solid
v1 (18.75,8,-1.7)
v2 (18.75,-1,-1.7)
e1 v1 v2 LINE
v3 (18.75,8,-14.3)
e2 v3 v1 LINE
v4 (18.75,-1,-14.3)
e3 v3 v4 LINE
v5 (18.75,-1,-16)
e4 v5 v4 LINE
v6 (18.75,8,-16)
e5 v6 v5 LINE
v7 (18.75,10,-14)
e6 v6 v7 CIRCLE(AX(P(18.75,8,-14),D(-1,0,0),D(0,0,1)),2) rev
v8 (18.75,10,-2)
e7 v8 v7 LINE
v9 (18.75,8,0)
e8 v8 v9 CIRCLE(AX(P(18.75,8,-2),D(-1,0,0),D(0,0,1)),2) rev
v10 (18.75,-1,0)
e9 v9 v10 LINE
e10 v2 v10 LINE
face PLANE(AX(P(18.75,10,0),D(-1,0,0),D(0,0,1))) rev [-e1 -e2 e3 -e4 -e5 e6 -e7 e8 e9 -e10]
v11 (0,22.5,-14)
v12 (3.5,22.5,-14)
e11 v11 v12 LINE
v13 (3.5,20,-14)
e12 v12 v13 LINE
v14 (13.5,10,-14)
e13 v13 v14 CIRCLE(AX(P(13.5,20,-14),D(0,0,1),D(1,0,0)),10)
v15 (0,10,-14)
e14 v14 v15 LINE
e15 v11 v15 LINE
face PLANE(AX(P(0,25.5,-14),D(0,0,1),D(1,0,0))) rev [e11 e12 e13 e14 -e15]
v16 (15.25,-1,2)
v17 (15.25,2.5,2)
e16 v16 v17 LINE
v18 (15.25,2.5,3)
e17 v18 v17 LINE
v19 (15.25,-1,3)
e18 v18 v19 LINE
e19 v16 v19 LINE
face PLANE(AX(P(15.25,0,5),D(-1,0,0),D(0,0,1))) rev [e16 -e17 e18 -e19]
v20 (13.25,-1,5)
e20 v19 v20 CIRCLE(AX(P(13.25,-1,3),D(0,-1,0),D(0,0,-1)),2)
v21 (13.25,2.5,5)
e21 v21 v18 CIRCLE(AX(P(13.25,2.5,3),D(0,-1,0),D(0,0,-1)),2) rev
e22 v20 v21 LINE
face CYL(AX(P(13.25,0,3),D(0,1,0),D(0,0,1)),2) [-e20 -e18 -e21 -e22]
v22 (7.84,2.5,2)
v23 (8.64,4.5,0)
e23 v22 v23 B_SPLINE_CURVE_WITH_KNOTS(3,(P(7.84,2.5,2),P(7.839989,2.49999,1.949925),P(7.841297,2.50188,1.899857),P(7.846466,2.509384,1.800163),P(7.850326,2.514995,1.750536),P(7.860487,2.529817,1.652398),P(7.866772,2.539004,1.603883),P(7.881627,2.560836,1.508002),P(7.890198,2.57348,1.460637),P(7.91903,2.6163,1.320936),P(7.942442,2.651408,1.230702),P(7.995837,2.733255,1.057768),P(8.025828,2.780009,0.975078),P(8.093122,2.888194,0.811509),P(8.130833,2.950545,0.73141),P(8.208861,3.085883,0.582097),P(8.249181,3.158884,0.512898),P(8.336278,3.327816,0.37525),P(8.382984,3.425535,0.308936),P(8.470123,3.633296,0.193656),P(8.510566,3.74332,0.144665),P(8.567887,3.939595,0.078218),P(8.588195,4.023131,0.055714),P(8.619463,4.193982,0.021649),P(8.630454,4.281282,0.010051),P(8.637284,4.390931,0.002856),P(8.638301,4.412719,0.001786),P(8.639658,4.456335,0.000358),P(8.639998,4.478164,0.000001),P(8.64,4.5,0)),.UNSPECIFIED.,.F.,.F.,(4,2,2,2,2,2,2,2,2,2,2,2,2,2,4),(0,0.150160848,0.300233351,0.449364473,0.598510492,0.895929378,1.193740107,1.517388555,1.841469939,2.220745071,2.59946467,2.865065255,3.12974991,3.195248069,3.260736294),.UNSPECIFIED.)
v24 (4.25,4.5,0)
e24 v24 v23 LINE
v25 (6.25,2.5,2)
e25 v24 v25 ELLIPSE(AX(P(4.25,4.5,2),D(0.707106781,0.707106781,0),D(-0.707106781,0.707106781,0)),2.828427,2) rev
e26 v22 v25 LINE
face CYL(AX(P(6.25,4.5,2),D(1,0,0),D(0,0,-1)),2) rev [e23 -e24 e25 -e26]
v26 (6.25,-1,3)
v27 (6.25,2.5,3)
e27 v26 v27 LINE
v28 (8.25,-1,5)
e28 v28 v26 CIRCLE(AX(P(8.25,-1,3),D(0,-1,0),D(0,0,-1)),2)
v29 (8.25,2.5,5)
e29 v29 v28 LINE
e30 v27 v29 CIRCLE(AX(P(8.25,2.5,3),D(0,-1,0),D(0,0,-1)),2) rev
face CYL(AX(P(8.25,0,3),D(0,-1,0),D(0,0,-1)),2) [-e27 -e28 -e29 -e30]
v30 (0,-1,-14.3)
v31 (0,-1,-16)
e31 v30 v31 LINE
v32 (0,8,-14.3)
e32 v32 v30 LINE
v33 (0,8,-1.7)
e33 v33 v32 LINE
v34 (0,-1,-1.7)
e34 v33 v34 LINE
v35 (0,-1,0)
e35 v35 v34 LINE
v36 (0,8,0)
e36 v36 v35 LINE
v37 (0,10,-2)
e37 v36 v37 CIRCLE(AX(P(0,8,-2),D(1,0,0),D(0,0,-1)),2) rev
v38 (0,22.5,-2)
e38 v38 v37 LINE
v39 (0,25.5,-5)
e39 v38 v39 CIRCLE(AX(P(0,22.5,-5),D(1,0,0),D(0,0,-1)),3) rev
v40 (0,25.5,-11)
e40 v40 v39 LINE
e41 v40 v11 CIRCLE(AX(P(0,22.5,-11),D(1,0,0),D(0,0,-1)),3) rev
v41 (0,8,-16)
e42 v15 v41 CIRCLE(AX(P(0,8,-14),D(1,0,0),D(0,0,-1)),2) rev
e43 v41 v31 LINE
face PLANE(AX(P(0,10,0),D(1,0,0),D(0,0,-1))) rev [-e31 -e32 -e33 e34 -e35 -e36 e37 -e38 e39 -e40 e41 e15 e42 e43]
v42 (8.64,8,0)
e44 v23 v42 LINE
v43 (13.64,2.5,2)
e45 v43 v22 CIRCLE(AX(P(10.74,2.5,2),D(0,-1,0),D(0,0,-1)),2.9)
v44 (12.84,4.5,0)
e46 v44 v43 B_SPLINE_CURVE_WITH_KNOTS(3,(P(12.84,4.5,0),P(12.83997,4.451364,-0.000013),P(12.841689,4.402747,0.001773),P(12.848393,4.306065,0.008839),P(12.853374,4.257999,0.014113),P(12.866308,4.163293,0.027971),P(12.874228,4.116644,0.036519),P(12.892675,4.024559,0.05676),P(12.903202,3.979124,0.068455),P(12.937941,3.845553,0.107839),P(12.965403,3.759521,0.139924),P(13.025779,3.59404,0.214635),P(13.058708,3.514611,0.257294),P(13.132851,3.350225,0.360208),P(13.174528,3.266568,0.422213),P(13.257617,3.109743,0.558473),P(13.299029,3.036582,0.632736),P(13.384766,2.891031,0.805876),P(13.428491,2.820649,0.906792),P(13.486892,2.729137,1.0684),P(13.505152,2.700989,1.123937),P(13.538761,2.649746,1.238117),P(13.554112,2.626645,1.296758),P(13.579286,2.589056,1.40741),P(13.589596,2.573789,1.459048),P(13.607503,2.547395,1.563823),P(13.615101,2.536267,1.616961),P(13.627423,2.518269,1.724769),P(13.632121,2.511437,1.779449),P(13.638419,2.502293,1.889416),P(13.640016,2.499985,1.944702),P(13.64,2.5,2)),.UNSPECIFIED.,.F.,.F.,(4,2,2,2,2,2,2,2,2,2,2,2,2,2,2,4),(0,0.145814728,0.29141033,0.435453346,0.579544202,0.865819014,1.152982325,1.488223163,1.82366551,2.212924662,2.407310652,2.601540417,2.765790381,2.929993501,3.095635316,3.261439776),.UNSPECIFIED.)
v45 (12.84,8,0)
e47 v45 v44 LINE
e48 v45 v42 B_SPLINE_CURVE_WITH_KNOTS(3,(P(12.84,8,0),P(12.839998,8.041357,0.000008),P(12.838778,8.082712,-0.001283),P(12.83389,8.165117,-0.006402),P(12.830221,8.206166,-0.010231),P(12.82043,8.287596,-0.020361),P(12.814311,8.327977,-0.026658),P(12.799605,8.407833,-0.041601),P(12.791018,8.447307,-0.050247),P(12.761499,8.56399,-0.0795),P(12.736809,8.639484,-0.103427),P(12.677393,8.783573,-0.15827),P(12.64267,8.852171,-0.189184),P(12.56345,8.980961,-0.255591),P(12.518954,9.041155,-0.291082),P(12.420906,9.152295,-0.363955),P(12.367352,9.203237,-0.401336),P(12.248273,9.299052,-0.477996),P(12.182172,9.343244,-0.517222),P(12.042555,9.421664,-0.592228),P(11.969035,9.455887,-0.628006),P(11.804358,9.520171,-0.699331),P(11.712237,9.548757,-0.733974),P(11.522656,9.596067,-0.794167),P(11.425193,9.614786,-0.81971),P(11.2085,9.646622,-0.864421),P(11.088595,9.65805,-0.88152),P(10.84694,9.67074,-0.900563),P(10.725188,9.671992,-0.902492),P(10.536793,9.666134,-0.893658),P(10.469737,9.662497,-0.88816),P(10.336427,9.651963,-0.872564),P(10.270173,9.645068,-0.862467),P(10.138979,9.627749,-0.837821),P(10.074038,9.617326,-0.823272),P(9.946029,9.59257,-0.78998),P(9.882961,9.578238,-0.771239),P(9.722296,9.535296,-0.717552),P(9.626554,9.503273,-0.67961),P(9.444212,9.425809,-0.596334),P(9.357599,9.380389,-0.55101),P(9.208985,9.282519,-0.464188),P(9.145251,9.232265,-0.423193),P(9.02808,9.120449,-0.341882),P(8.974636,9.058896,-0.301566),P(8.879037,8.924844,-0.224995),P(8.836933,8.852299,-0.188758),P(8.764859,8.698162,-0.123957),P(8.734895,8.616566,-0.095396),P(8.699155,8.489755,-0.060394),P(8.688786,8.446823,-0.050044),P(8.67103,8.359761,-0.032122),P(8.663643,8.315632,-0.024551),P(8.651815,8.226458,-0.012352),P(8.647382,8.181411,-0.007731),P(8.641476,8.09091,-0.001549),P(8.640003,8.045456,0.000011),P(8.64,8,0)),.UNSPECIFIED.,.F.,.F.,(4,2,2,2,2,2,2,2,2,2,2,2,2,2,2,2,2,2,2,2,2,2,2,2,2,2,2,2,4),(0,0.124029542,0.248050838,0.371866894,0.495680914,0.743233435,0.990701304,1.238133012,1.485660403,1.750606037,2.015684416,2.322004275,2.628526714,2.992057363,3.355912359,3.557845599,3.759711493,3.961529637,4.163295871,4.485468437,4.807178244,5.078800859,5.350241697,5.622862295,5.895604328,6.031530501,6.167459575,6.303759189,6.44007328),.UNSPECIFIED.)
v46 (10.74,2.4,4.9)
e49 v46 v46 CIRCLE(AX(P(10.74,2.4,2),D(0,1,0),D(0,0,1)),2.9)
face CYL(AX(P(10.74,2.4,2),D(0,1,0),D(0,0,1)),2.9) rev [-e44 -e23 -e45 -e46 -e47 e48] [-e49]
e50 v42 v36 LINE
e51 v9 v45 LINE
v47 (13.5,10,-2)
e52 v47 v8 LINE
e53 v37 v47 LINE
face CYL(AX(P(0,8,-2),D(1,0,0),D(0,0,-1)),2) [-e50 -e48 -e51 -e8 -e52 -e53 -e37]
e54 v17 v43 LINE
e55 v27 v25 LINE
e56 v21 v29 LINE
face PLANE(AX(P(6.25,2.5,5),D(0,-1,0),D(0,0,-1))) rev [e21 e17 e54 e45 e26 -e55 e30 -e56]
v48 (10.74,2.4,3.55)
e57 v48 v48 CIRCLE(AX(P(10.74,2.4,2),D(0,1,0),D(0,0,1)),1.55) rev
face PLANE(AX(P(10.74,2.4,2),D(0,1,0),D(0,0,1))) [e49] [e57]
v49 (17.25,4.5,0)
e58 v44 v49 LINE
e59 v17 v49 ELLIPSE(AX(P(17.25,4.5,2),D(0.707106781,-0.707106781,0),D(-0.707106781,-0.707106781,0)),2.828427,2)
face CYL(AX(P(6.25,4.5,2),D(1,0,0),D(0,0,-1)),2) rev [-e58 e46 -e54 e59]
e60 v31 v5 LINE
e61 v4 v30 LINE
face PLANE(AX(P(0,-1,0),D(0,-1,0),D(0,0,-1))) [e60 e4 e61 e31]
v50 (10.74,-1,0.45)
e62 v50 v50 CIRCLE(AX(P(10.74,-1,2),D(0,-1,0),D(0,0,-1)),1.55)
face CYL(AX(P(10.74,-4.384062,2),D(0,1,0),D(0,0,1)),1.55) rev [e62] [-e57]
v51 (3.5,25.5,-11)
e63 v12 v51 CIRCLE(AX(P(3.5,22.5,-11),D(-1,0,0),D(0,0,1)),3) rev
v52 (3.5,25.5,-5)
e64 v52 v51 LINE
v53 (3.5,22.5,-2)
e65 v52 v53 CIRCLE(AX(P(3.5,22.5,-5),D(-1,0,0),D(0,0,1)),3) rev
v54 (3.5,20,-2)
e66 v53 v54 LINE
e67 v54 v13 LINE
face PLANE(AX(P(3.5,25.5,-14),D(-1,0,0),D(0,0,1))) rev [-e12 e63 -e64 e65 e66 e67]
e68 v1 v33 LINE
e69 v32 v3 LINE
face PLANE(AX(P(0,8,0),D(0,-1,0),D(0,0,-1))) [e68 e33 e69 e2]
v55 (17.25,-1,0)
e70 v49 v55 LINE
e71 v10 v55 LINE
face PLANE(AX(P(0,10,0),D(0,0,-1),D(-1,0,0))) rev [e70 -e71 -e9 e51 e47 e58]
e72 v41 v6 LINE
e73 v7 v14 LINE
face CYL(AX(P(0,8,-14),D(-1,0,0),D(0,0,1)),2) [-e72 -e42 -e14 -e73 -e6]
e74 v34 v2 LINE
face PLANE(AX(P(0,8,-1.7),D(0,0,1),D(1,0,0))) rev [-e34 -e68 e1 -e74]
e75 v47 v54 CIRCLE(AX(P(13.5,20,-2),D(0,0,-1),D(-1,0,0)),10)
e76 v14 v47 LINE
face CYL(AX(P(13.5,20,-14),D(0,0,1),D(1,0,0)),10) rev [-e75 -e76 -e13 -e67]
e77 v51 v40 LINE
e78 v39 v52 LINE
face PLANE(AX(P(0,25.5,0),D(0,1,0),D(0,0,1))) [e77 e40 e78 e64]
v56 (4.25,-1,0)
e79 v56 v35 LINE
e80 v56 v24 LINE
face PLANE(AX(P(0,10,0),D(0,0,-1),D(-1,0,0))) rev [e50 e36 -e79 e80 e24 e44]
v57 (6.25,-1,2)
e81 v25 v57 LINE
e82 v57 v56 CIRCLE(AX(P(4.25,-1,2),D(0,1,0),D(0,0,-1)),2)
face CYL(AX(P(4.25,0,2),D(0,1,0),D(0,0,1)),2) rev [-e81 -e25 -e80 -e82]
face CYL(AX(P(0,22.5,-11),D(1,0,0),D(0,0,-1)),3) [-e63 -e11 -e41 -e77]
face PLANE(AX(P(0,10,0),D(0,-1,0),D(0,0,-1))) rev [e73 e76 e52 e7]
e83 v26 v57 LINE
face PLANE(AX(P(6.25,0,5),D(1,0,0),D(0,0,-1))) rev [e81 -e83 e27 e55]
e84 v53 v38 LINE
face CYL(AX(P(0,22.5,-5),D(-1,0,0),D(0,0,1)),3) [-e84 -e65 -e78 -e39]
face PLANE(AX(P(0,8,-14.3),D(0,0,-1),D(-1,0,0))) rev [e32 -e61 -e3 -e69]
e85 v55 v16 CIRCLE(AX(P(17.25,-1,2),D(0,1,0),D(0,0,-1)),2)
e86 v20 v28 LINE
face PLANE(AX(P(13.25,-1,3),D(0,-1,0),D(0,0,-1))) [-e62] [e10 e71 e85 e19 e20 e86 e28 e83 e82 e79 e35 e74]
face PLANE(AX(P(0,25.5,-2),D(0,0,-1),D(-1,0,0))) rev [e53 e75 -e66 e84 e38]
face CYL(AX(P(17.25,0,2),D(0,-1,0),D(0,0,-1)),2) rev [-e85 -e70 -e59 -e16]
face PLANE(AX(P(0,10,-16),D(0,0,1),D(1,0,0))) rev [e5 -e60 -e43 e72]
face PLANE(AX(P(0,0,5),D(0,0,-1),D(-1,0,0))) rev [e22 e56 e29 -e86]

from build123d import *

# Parameters (mm, degrees)
SALIENTE_EXTRUIR1_DEPTH = 10
CORTAR_EXTRUIR1_DEPTH   = 8
CROQUIS3_W              = 9
CROQUIS3_H              = 2.5
SALIENTE_EXTRUIR2_DEPTH = 5
CROQUIS4_R              = 1.5499999999999994
CORTAR_EXTRUIR2_DEPTH   = 2.5
REDONDEO1_R             = 2
CROQUIS5_R              = 2.9
CORTAR_EXTRUIR3_DEPTH   = 7.6
SALIENTE_EXTRUIR3_DEPTH = 15.5
REDONDEO2_R             = 10
REDONDEO3_R             = 3
CROQUIS8_R              = 1.5499999999999994
SALIENTE_EXTRUIR5_DEPTH = 1
CROQUIS9_W              = 5
CROQUIS9_H              = 1.700000000000001
CORTAR_EXTRUIR4_DEPTH   = 36.46565245064583


with BuildPart() as part:
    # Croquis1 → Saliente-Extruir1 (new body)
    with BuildSketch(Plane(origin=(0, 0, 0), x_dir=(1, 0, 0), z_dir=(0, 1, 0))):
        Polygon((0, 0), (18.75, 0), (18.749999999999996, 16), (-3.47e-15, 16), align=None)
    extrude(amount=SALIENTE_EXTRUIR1_DEPTH)

    # Croquis2 → Cortar-Extruir1 (cut)
    with BuildSketch(Plane.XZ):
        Polygon((0, -1.7000000000000002), (18.749999999999993, -1.6999999999999997), (18.749999999999996, -14.3), (1.51e-15, -14.3), align=None)
    extrude(amount=-CORTAR_EXTRUIR1_DEPTH, mode=Mode.SUBTRACT)

    # Croquis3 → Saliente-Extruir2 (add)
    with BuildSketch(Plane.XY):
        with Locations((10.750000000000002, 1.25)):
            Rectangle(CROQUIS3_W, CROQUIS3_H)
    extrude(amount=SALIENTE_EXTRUIR2_DEPTH)

    # Croquis4 → Cortar-Extruir2 (cut)
    with BuildSketch(Plane(origin=(0, 2.5, 0), x_dir=(1, 0, 0), z_dir=(0, 1, 0))):
        with Locations(Location((10.74, -2, 0), (0, 0, 270))):
            Circle(CROQUIS4_R)
    extrude(amount=-CORTAR_EXTRUIR2_DEPTH, mode=Mode.SUBTRACT)

    # Redondeo1
    # the kernel refuses this fillet: 2 mm, written as the material it adds along each edge
    with BuildSketch(Plane(origin=(6.25, 2.5, 0), x_dir=(-1, 0, 0), z_dir=(0, -1, 0))) as redondeo1_piece_1:
        with BuildLine():
            CenterArc((REDONDEO1_R, -REDONDEO1_R), REDONDEO1_R, 90, 90)
            Line((0, -REDONDEO1_R), (0, 0))
            Line((0, 0), (REDONDEO1_R, 0))
        make_face()
    extrude(amount=2.5)
    with BuildSketch(Plane(origin=(15.25, 0, 0), x_dir=(1, 0, 0), z_dir=(0, 1, 0))) as redondeo1_piece_2:
        with BuildLine():
            CenterArc((REDONDEO1_R, -REDONDEO1_R), REDONDEO1_R, 90, 90)
            Line((0, -REDONDEO1_R), (0, 0))
            Line((0, 0), (REDONDEO1_R, 0))
        make_face()
    extrude(amount=2.5)
    with BuildSketch(Plane(origin=(15.25, 2.5, 0), x_dir=(0, 1, 0), z_dir=(-1, 0, 0))) as redondeo1_piece_3_section:
        with BuildLine():
            CenterArc((REDONDEO1_R, -REDONDEO1_R), REDONDEO1_R, 90, 90)
            Line((0, -REDONDEO1_R), (0, 0))
            Line((0, 0), (REDONDEO1_R, 0))
        make_face()
    redondeo1_piece_3 = extrude(amount=9, mode=Mode.PRIVATE)
    redondeo1_piece_3 = redondeo1_piece_3 - Plane(origin=(10.74, 2.981912580650479, 2), x_dir=(-1.8e-16, 0, 1), z_dir=(0, 1, 0)) * Cylinder(1.5499999999999994, 26, mode=Mode.PRIVATE)
    add(redondeo1_piece_3)
    with BuildSketch(Plane(origin=(6.25, 7.5, 0), x_dir=(-1, 0, 0), z_dir=(0, -1, 0))) as redondeo1_piece_4a_section:
        with BuildLine():
            CenterArc((REDONDEO1_R, -REDONDEO1_R), REDONDEO1_R, 90, 90)
            Line((0, -REDONDEO1_R), (0, 0))
            Line((0, 0), (REDONDEO1_R, 0))
        make_face()
    redondeo1_piece_4a = extrude(amount=7.5, mode=Mode.PRIVATE)
    redondeo1_piece_4a = split(redondeo1_piece_4a, bisect_by=Plane(origin=(5.797209771466349, 2.5, 0.45279022853365075), z_dir=(0, 1, 0)), keep=Keep.TOP, mode=Mode.PRIVATE)
    with BuildSketch(Plane(origin=(15.25, 2.5, 0), x_dir=(0, 1, 0), z_dir=(-1, 0, 0))) as redondeo1_piece_4b_section:
        with BuildLine():
            CenterArc((REDONDEO1_R, -REDONDEO1_R), REDONDEO1_R, 90, 90)
            Line((0, -REDONDEO1_R), (0, 0))
            Line((0, 0), (REDONDEO1_R, 0))
        make_face()
    redondeo1_piece_4b = extrude(amount=14, mode=Mode.PRIVATE)
    redondeo1_piece_4b = split(redondeo1_piece_4b, bisect_by=Plane(origin=(6.25, 2.952790228533651, 0.45279022853365075), z_dir=(-1, 0, 0)), keep=Keep.TOP, mode=Mode.PRIVATE)
    redondeo1_piece_4 = redondeo1_piece_4a & redondeo1_piece_4b
    add(redondeo1_piece_4)
    with BuildSketch(Plane(origin=(20.25, 2.5, 0), x_dir=(0, 1, 0), z_dir=(-1, 0, 0))) as redondeo1_piece_5a_section:
        with BuildLine():
            CenterArc((REDONDEO1_R, -REDONDEO1_R), REDONDEO1_R, 90, 90)
            Line((0, -REDONDEO1_R), (0, 0))
            Line((0, 0), (REDONDEO1_R, 0))
        make_face()
    redondeo1_piece_5a = extrude(amount=14, mode=Mode.PRIVATE)
    redondeo1_piece_5a = split(redondeo1_piece_5a, bisect_by=Plane(origin=(18.75, 2.952790228533651, 0.45279022853365036), z_dir=(-1, 0, 2.2e-16)), keep=Keep.TOP, mode=Mode.PRIVATE)
    redondeo1_piece_5a = split(redondeo1_piece_5a, bisect_by=Plane(origin=(15.25, 2.952790228533651, 0.45279022853365075), z_dir=(1, 0, 0)), keep=Keep.TOP, mode=Mode.PRIVATE)
    with BuildSketch(Plane(origin=(15.25, 0, 0), x_dir=(1, 0, 0), z_dir=(0, 1, 0))) as redondeo1_piece_5b_section:
        with BuildLine():
            CenterArc((REDONDEO1_R, -REDONDEO1_R), REDONDEO1_R, 90, 90)
            Line((0, -REDONDEO1_R), (0, 0))
            Line((0, 0), (REDONDEO1_R, 0))
        make_face()
    redondeo1_piece_5b = extrude(amount=7.5, mode=Mode.PRIVATE)
    redondeo1_piece_5b = split(redondeo1_piece_5b, bisect_by=Plane(origin=(15.70279022853365, 2.5, 0.45279022853364964), z_dir=(0, 1, 0)), keep=Keep.TOP, mode=Mode.PRIVATE)
    redondeo1_piece_5 = redondeo1_piece_5a & redondeo1_piece_5b
    add(redondeo1_piece_5)
    # the kernel refuses this fillet: 2 mm, written as the material it takes off along each edge
    with BuildSketch(Plane(origin=(23.749999999999996, 10, -16), x_dir=(0, -1, 0), z_dir=(-1, 0, 0))) as redondeo1_2_piece_1:
        with BuildLine():
            CenterArc((REDONDEO1_R, REDONDEO1_R), REDONDEO1_R, 180, 90)
            Line((0, REDONDEO1_R), (0, 0))
            Line((0, 0), (REDONDEO1_R, 0))
        make_face()
    extrude(amount=28.75, mode=Mode.SUBTRACT)
    with BuildSketch(Plane(origin=(6.25, 7.5, 5), x_dir=(0, 0, -1), z_dir=(0, -1, 0))) as redondeo1_2_piece_2:
        with BuildLine():
            CenterArc((REDONDEO1_R, REDONDEO1_R), REDONDEO1_R, 180, 90)
            Line((0, REDONDEO1_R), (0, 0))
            Line((0, 0), (REDONDEO1_R, 0))
        make_face()
    extrude(amount=12.5, mode=Mode.SUBTRACT)
    with BuildSketch(Plane(origin=(15.25, -5, 5), x_dir=(0, 0, -1), z_dir=(0, 1, 0))) as redondeo1_2_piece_3:
        with BuildLine():
            CenterArc((REDONDEO1_R, REDONDEO1_R), REDONDEO1_R, 180, 90)
            Line((0, REDONDEO1_R), (0, 0))
            Line((0, 0), (REDONDEO1_R, 0))
        make_face()
    extrude(amount=12.5, mode=Mode.SUBTRACT)
    with BuildSketch(Plane(origin=(-5, 10, 0), x_dir=(0, -1, 0), z_dir=(1, 0, 0))) as redondeo1_2_piece_4:
        with BuildLine():
            CenterArc((REDONDEO1_R, REDONDEO1_R), REDONDEO1_R, 180, 90)
            Line((0, REDONDEO1_R), (0, 0))
            Line((0, 0), (REDONDEO1_R, 0))
        make_face()
    extrude(amount=28.75, mode=Mode.SUBTRACT)

    # Croquis5 → Cortar-Extruir3 (cut)
    with BuildSketch(Plane(origin=(0, 10, 0), x_dir=(1, 0, 0), z_dir=(0, 1, 0))):
        with Locations(Location((10.74, -2, 0), (0, 0, 270))):
            Circle(CROQUIS5_R)
    extrude(amount=-CORTAR_EXTRUIR3_DEPTH, mode=Mode.SUBTRACT)

    # Croquis6 → Saliente-Extruir3 (add)
    with BuildSketch(Plane(origin=(0, 10, 0), x_dir=(1, 0, 0), z_dir=(0, 1, 0))):
        Polygon((-3.04e-15, 14), (3.499999999999997, 14), (3.4999999999999982, 2), (-3.04e-15, 2), align=None)
    extrude(amount=SALIENTE_EXTRUIR3_DEPTH)

    # Redondeo2
    # the kernel refuses this fillet: 10 mm, written as the material it adds along each edge
    with BuildSketch(Plane(origin=(3.499999999999997, 10, -14), x_dir=(1, 0, -1.1e-16), z_dir=(1.1e-16, 0, 1))) as redondeo2_piece_1:
        with BuildLine():
            CenterArc((REDONDEO2_R, REDONDEO2_R), REDONDEO2_R, 180, 90)
            Line((-2.22e-15, REDONDEO2_R), (0, 0))
            Line((0, 0), (REDONDEO2_R, 0))
        make_face()
    extrude(amount=12)

    # Redondeo3
    redondeo3_edges = [part.edges().sort_by_distance(p)[0] for p in [
        (1.7499999999999976, 25.5, -2),
        (1.749999999999997, 25.5, -14),
    ]]
    fillet(redondeo3_edges, radius=REDONDEO3_R)

    # Croquis8 → Saliente-Extruir5 (add)
    # profile 1 of 2: a face of its own
    with BuildSketch(Plane.XZ):
        with BuildLine():
            Line((13.25, 5), (8.25, 5))
            ThreePointArc((8.25, 5), (6.835786437626905, 4.414213562373095), (6.25, 3.0000000000000004))
            Line((6.25, 3.0000000000000004), (6.25, 2))
            ThreePointArc((6.25, 2), (5.664213562373095, 0.5857864376269051), (4.25, 0))
            Line((4.25, 0), (-5, 1.08e-15))
            Line((-5, 1.08e-15), (-5, -1.699999999999999))
            Line((-5, -1.699999999999999), (18.749999999999993, -1.6999999999999997))
            Line((18.749999999999993, -1.6999999999999997), (18.75, 0))
            Line((18.75, 0), (17.25, 0))
            ThreePointArc((17.25, 0), (15.835786437626904, 0.5857864376269051), (15.25, 2.0000000000000004))
            Line((15.25, 2.0000000000000004), (15.25, 3))
            ThreePointArc((15.25, 3), (14.664213562373096, 4.414213562373095), (13.25, 5))
        make_face()
        with Locations(Location((10.74, 2, 0), (0, 0, 90))):
            Circle(CROQUIS8_R, mode=Mode.SUBTRACT)
    # profile 2 of 2: a face of its own
    with BuildSketch(Plane.XZ):
        Polygon((18.749999999999996, -14.3), (-5.0000000000000036, -14.299999999999999), (-5.0000000000000036, -16), (18.749999999999996, -16), align=None)
    extrude(amount=SALIENTE_EXTRUIR5_DEPTH)

    # Croquis9 → Cortar-Extruir4 (cut, through all)
    with BuildSketch(Plane(origin=(0, 0, 0), x_dir=(1, 0, 0), z_dir=(0, 1, 0))):
        with Locations((-2.5000000000000036, 15.149999999999999)):
            Rectangle(CROQUIS9_W, CROQUIS9_H)
        Polygon((-5, -1.08e-15), (0, 0), (0, 1.7000000000000002), (-5, 1.699999999999999), align=None)
    extrude(amount=-CORTAR_EXTRUIR4_DEPTH, mode=Mode.SUBTRACT)


solid = part.part
